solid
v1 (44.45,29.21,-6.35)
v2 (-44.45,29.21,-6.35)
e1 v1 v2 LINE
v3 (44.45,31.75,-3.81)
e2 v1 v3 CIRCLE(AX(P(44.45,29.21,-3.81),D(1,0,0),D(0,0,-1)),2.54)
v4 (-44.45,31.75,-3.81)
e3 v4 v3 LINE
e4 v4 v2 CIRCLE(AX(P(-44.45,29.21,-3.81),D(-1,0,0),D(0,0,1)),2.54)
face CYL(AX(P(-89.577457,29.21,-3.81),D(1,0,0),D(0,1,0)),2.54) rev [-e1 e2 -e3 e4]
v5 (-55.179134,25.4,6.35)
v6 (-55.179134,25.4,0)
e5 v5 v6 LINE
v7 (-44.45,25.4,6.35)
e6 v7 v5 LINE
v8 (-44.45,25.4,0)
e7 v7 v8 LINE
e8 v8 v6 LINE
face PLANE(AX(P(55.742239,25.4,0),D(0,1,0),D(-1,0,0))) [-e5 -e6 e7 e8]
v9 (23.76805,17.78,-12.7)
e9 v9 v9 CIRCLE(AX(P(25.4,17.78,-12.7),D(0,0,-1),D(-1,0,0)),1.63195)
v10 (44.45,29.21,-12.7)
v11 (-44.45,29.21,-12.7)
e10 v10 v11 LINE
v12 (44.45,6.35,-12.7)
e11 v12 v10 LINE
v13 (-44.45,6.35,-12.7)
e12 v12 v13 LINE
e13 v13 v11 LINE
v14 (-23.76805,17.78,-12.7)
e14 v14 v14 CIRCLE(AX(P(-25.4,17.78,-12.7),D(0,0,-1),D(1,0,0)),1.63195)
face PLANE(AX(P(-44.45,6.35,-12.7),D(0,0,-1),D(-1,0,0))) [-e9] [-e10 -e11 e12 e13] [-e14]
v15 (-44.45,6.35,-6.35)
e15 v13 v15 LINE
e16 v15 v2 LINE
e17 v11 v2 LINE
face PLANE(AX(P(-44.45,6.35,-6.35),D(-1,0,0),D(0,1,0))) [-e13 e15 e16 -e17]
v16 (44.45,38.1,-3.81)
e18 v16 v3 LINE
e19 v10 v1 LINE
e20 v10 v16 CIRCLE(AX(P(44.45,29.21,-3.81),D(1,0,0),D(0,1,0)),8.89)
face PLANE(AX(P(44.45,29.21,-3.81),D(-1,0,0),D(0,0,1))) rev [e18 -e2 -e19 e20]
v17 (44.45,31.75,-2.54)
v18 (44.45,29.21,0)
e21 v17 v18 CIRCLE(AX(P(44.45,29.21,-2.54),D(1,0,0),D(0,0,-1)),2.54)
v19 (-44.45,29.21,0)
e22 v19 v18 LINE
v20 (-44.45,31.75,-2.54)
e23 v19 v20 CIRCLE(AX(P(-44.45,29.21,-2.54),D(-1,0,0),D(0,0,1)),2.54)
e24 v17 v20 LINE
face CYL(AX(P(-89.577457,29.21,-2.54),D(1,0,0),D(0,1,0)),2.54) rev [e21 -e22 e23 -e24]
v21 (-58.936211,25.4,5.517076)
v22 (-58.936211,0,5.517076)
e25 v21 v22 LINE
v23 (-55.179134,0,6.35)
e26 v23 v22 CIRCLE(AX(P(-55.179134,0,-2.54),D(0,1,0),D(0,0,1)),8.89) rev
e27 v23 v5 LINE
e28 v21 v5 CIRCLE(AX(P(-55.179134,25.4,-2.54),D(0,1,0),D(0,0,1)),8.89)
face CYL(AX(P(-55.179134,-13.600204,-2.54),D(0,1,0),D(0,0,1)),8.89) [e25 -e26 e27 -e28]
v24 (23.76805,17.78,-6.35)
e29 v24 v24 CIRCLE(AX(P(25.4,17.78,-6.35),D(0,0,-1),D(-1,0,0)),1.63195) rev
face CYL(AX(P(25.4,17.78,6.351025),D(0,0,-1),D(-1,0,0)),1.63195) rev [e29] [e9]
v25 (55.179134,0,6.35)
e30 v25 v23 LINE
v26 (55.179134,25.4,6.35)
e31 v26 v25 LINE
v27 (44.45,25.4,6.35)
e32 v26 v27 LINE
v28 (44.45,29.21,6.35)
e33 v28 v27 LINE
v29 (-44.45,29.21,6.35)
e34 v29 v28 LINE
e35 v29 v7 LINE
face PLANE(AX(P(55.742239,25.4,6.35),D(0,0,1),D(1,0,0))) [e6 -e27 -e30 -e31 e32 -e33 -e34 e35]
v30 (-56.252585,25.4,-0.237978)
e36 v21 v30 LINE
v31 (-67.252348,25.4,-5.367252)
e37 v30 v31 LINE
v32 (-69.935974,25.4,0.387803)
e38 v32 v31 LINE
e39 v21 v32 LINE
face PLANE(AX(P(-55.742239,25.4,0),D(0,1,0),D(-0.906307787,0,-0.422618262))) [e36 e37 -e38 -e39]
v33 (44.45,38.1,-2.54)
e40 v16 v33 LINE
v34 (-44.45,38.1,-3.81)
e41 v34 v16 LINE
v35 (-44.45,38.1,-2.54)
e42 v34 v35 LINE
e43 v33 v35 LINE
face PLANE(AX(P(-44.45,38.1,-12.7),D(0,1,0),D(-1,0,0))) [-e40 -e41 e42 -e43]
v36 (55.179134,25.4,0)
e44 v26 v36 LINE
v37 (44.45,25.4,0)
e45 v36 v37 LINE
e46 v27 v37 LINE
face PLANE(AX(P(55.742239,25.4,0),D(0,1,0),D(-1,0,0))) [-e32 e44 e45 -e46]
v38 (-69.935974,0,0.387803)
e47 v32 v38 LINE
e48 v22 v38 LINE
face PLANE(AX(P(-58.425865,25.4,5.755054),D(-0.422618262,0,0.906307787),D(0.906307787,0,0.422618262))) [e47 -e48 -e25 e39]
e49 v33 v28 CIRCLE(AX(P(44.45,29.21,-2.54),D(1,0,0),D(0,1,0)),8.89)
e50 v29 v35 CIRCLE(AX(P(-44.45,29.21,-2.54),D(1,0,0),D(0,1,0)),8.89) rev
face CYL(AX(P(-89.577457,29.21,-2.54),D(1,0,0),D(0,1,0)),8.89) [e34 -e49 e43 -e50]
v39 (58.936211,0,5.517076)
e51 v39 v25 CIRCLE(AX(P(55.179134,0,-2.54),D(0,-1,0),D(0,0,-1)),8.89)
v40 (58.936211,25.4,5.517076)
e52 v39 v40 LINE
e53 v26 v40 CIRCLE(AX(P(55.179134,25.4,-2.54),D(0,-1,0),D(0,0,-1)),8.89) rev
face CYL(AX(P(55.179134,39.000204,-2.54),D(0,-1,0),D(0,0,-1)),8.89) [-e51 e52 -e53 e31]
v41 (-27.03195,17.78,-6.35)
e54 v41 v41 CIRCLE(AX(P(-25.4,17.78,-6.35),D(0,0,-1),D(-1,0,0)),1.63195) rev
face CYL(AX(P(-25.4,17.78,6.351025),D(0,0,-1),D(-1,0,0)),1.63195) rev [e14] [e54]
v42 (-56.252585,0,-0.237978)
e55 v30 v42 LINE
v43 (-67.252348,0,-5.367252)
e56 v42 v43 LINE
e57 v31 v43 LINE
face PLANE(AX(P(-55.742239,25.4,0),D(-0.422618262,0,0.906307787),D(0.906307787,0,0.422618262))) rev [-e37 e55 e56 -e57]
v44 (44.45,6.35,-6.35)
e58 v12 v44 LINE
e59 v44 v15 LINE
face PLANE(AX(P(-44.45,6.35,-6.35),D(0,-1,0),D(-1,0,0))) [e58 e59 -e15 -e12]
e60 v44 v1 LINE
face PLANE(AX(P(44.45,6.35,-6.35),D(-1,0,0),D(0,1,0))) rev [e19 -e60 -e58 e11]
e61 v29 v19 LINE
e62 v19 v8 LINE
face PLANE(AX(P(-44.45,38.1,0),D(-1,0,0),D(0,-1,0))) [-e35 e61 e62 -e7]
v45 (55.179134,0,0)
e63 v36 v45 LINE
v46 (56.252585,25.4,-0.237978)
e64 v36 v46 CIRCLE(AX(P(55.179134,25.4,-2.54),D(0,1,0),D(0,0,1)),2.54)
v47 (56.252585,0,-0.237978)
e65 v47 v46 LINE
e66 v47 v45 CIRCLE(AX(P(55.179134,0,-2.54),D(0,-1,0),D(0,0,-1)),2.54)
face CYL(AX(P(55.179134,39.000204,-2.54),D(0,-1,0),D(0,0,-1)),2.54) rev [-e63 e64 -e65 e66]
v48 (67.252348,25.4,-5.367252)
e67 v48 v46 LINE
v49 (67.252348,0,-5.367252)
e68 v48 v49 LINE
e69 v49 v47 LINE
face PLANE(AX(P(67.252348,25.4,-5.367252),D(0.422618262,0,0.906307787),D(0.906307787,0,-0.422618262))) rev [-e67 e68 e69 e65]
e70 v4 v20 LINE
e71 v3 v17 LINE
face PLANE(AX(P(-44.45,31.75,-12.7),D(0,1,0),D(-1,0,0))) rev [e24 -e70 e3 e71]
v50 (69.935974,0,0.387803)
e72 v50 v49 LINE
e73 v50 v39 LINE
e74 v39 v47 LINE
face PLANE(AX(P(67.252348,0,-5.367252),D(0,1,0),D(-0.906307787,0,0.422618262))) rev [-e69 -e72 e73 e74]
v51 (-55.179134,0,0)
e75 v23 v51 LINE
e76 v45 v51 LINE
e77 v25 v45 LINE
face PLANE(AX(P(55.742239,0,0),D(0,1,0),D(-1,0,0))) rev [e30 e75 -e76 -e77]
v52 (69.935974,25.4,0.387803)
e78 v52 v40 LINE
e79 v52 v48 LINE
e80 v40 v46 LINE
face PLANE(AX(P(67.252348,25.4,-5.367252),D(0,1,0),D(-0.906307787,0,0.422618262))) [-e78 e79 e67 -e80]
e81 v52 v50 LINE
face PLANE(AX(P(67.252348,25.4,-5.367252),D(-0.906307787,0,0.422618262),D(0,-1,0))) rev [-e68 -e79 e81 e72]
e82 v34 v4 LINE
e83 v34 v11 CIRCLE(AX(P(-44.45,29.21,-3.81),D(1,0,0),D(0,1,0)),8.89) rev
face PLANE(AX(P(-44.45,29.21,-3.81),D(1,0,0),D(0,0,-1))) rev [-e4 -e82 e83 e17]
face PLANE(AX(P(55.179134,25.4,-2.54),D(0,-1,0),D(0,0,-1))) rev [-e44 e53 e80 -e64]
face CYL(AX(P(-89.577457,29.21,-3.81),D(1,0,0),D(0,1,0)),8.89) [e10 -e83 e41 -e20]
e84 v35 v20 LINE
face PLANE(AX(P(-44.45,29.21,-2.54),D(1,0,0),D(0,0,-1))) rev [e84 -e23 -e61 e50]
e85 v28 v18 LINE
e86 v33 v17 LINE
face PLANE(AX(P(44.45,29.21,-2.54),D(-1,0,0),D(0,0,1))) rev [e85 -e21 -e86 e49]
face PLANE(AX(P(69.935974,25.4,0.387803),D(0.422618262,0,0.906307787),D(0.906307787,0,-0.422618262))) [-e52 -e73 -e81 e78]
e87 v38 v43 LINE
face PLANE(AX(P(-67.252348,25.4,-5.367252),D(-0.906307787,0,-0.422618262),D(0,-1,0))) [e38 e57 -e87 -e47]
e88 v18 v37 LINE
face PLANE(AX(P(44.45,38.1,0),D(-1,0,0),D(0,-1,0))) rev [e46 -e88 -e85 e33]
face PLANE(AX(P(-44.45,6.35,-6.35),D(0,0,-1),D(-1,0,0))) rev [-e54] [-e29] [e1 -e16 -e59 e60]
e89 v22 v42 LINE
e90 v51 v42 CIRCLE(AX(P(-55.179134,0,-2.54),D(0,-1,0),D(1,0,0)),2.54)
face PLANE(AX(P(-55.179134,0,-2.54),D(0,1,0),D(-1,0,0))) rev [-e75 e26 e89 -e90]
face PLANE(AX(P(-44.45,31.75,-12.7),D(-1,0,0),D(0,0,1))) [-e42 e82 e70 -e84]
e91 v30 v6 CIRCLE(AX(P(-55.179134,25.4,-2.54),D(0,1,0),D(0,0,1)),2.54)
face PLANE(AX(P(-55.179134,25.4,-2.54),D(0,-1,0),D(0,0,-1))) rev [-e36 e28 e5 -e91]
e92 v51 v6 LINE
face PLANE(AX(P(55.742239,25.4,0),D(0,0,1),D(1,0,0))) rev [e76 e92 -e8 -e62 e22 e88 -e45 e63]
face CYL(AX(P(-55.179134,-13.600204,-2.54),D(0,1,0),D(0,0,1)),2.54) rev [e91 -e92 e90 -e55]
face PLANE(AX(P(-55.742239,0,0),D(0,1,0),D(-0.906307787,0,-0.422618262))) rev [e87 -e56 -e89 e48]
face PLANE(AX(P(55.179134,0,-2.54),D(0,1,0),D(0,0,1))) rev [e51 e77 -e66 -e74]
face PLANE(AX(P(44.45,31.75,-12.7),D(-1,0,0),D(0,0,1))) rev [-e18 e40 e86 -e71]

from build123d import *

# Parameters (mm, degrees)
BOSS_EXTRUDE1_DEPTH    = 25.4
SKETCH2_W              = 88.9
SKETCH2_H              = 6.35
BOSS_EXTRUDE2_DEPTH    = 12.7
SKETCH3_W              = 88.9
SKETCH3_H              = 6.35
BOSS_EXTRUDE3_DEPTH    = 12.7
SKETCH4_W              = 88.9
SKETCH4_H              = 6.35
BOSS_EXTRUDE5_DEPTH    = 25.4
FILLET4_R              = 2.54
CONVERT_SOLID1_START   = -1
CONVERT_SOLID1_DEPTH   = 32.8041528
CONVERT_SOLID1_START_2 = -44.45
CONVERT_SOLID1_2_DEPTH = 88.9
CUT_EXTRUDE1_REACH     = 83.887
SKETCH6_R              = 1.63195
UNFOLD1_START          = -12.7
UNFOLD1_OUTLINE_R      = 1.63195
UNFOLD1_DEPTH          = 12.7
UNFOLD1_2_OUTLINE_W    = 1.190330825
UNFOLD1_2_OUTLINE_H    = 25.4
UNFOLD1_2_DEPTH        = 1.940687
UNFOLD1_3_OUTLINE_W    = 88.9
UNFOLD1_3_OUTLINE_H    = 45.894202015
UNFOLD1_3_OUTLINE_R    = 1.63195
UNFOLD1_3_DEPTH        = 6.35
FOLD1_START            = 38.1
FOLD1_OUTLINE_W        = 88.9
FOLD1_OUTLINE_H        = 6.35
FOLD1_DEPTH            = 33.194202015
FOLD1_2_DEPTH          = 25.4
FOLD1_START_2          = 6.35
FOLD1_3_OUTLINE_W      = 88.9
FOLD1_3_OUTLINE_H      = 6.35
FOLD1_3_DEPTH          = 9.7980499
FOLD1_START_3          = 19.4119501
FOLD1_4_OUTLINE_W      = 88.9
FOLD1_4_OUTLINE_H      = 6.35
FOLD1_4_DEPTH          = 9.7980499
FOLD1_START_4          = 31.75
FOLD1_5_OUTLINE_W      = 88.9
FOLD1_5_OUTLINE_H      = 6.35
FOLD1_5_DEPTH          = 5.563988164
FOLD1_6_DEPTH          = 25.4
FOLD1_START_5          = -44.45
FOLD1_7_DEPTH          = 88.9
FOLD1_START_6          = -12.7
FOLD1_8_DEPTH          = 6.35
FOLD1_9_DEPTH          = 88.9


with BuildPart() as part:
    # Sketch1 → Boss-Extrude1 (new body)
    with BuildSketch(Plane(origin=(0, 0, 0), x_dir=(1, 0, 0), z_dir=(0, 1, 0))):
        Polygon((-57.15, -6.35), (57.15, -6.35), (69.93597375, -0.387802524), (67.252347788, 5.367251924), (55.742238892, 0), (-55.742238892, 0), (-67.252347788, 5.367251924), (-69.93597375, -0.387802524), align=None)
    extrude(amount=BOSS_EXTRUDE1_DEPTH)

    # Sketch2 → Boss-Extrude2 (add)
    with BuildSketch(Plane(origin=(0, 25.4, 0), x_dir=(1, 0, 0), z_dir=(0, 1, 0))):
        with Locations((0, -3.175)):
            Rectangle(SKETCH2_W, SKETCH2_H)
    extrude(amount=BOSS_EXTRUDE2_DEPTH)

    # Sketch3 → Boss-Extrude3 (add)
    with BuildSketch(Plane(origin=(0, 0, 0), x_dir=(-1, 0, 0), z_dir=(0, 0, -1))):
        with Locations((0, 34.925)):
            Rectangle(SKETCH3_W, SKETCH3_H)
    extrude(amount=BOSS_EXTRUDE3_DEPTH)

    # Sketch4 → Boss-Extrude5 (add)
    with BuildSketch(Plane.XZ.offset(-31.75)):
        with Locations((0, -9.525)):
            Rectangle(SKETCH4_W, SKETCH4_H)
    extrude(amount=BOSS_EXTRUDE5_DEPTH)

    # Fillet4
    fillet4_edges = [part.edges().sort_by_distance(p)[0] for p in [
        (57.15, 12.7, 6.35),
        (-57.15, 12.7, 6.35),
        (-55.742238892, 12.7, 0),
        (55.742238892, 12.7, 0),
        (0, 38.1, 6.35),
        (0, 31.75, -6.35),
        (0, 38.1, -12.7),
        (0, 31.75, 0),
    ]]
    fillet(fillet4_edges, radius=FILLET4_R)

    # Convert-Solid1: read off the stored shape, not the designer's step
    # Convert-Solid1 outline → Convert-Solid1 (cut)
    with BuildSketch(Plane(origin=(0, 0, 0), x_dir=(1, 0, 0), z_dir=(0, 1, 0)).offset(CONVERT_SOLID1_START)):
        with BuildLine():
            ThreePointArc((58.936210796, -5.517076227), (57.103282617, -6.139271503), (55.179134449, -6.35))
            Line((55.179134449, -6.35), (56.586895557, -6.35))
            ThreePointArc((56.586895557, -6.35), (57.136652176, -6.289791858), (57.660345942, -6.112021779))
            Line((57.660345942, -6.112021779), (58.936210796, -5.517076227))
        make_face()
        with BuildLine():
            Line((-56.586895557, -6.35), (-55.179134449, -6.35))
            ThreePointArc((-55.179134449, -6.35), (-57.103282617, -6.139271503), (-58.936210796, -5.517076227))
            Line((-58.936210796, -5.517076227), (-57.660345942, -6.112021779))
            ThreePointArc((-57.660345942, -6.112021779), (-57.136652176, -6.289791858), (-56.586895557, -6.35))
        make_face()
    extrude(amount=CONVERT_SOLID1_DEPTH, mode=Mode.SUBTRACT)

    # Convert-Solid1 2 outline → Convert-Solid1 2 (cut)
    with BuildSketch(Plane.YZ.offset(CONVERT_SOLID1_START_2)):
        with BuildLine():
            ThreePointArc((29.21, 6.35), (35.496179285, 3.746179285), (38.1, -2.54))
            Line((38.1, -2.54), (38.1, 3.81))
            ThreePointArc((38.1, 3.81), (37.356051224, 5.606051224), (35.56, 6.35))
            Line((35.56, 6.35), (29.21, 6.35))
        make_face()
        with BuildLine():
            ThreePointArc((38.1, -3.81), (35.496179285, -10.096179285), (29.21, -12.7))
            Line((29.21, -12.7), (35.56, -12.7))
            ThreePointArc((35.56, -12.7), (37.356051224, -11.956051224), (38.1, -10.16))
            Line((38.1, -10.16), (38.1, -3.81))
        make_face()
    extrude(amount=CONVERT_SOLID1_2_DEPTH, mode=Mode.SUBTRACT)

    # Sketch6 → Cut-Extrude1 (cut, up to next)
    with BuildSketch(Plane(origin=(0, 0, -12.7), x_dir=(-1, 0, 0), z_dir=(0, 0, -1)), mode=Mode.PRIVATE) as cut_extrude1_sk1:
        with Locations((-25.4, 17.78)):
            Circle(SKETCH6_R)
    cut_extrude1_tool1 = extrude(cut_extrude1_sk1.sketch, amount=-CUT_EXTRUDE1_REACH, mode=Mode.PRIVATE) & part.part
    # Sketch6 → Cut-Extrude1 (cut, up to next)
    with BuildSketch(Plane(origin=(0, 0, -12.7), x_dir=(-1, 0, 0), z_dir=(0, 0, -1)), mode=Mode.PRIVATE) as cut_extrude1_sk2:
        with Locations((25.4, 17.78)):
            Circle(SKETCH6_R)
    cut_extrude1_tool2 = extrude(cut_extrude1_sk2.sketch, amount=-CUT_EXTRUDE1_REACH, mode=Mode.PRIVATE) & part.part
    add(cut_extrude1_tool1.solids().sort_by_distance((25.4, 17.78, -12.7))[0], mode=Mode.SUBTRACT)
    add(cut_extrude1_tool2.solids().sort_by_distance((-25.4, 17.78, -12.7))[0], mode=Mode.SUBTRACT)

    # Unfold1: read off the stored shape, not the designer's step
    # Unfold1 outline → Unfold1 (cut)
    with BuildSketch(Plane.XY.offset(UNFOLD1_START)):
        Polygon((44.45, 38.1), (-44.45, 38.1), (-44.45, 25.4), (-69.809669175, 25.4), (-69.809669175, 0), (69.809669175, 0), (69.809669175, 25.4), (44.45, 25.4), align=None)
        with Locations((25.4, 17.78)):
            Circle(UNFOLD1_OUTLINE_R, mode=Mode.SUBTRACT)
        with Locations((-25.4, 17.78)):
            Circle(UNFOLD1_OUTLINE_R, mode=Mode.SUBTRACT)
    extrude(amount=UNFOLD1_DEPTH, mode=Mode.SUBTRACT)

    # Unfold1 2 outline → Unfold1 2 (cut)
    with BuildSketch(Plane.XY):
        with Locations((-70.404834588, 12.7)):
            Rectangle(UNFOLD1_2_OUTLINE_W, UNFOLD1_2_OUTLINE_H)
        with Locations((70.404834588, 12.7)):
            Rectangle(UNFOLD1_2_OUTLINE_W, UNFOLD1_2_OUTLINE_H)
    extrude(amount=UNFOLD1_2_DEPTH, mode=Mode.SUBTRACT)

    # Unfold1 3 outline → Unfold1 3 (add)
    # profile 1 of 2: a face of its own
    with BuildSketch(Plane.XY):
        with Locations((0, 48.347101008)):
            Rectangle(UNFOLD1_3_OUTLINE_W, UNFOLD1_3_OUTLINE_H)
        with Locations((-25.4, 59.864202015)):
            Circle(UNFOLD1_3_OUTLINE_R, mode=Mode.SUBTRACT)
        with Locations((25.4, 59.864202015)):
            Circle(UNFOLD1_3_OUTLINE_R, mode=Mode.SUBTRACT)
    # profile 2 of 2: a face of its own
    with BuildSketch(Plane.XY):
        Polygon((-44.45, 6.35), (-44.45, 25.4), (-69.809669175, 25.4), (-69.809669175, 0), (69.809669175, 0), (69.809669175, 25.4), (44.45, 25.4), (44.45, 6.35), align=None)
    extrude(amount=UNFOLD1_3_DEPTH)

    # Fold1: read off the stored shape, not the designer's step
    # Fold1 outline → Fold1 (cut)
    with BuildSketch(Plane(origin=(0, 0, 0), x_dir=(1, 0, 0), z_dir=(0, 1, 0)).offset(FOLD1_START)):
        with Locations((0, -3.175)):
            Rectangle(FOLD1_OUTLINE_W, FOLD1_OUTLINE_H)
    extrude(amount=FOLD1_DEPTH, mode=Mode.SUBTRACT)

    # Fold1 2 outline → Fold1 2 (cut)
    with BuildSketch(Plane(origin=(0, 0, 0), x_dir=(1, 0, 0), z_dir=(0, 1, 0))):
        with BuildLine():
            Line((-58.936210796, -5.517076227), (-69.809669175, -0.446699315))
            Line((-69.809669175, -0.446699315), (-69.809669175, -6.35))
            Line((-69.809669175, -6.35), (-55.179134449, -6.35))
            ThreePointArc((-55.179134449, -6.35), (-57.103282617, -6.139271503), (-58.936210796, -5.517076227))
        make_face()
        Polygon((-69.809669175, -0.116941489), (-69.755138463, 0), (-69.809669175, 0), align=None)
        with BuildLine():
            Line((69.809669175, -6.35), (69.809669175, -0.446699315))
            Line((69.809669175, -0.446699315), (58.936210796, -5.517076227))
            ThreePointArc((58.936210796, -5.517076227), (57.103282617, -6.139271503), (55.179134449, -6.35))
            Line((55.179134449, -6.35), (69.809669175, -6.35))
        make_face()
        Polygon((69.809669175, 0), (69.755138463, 0), (69.809669175, -0.116941489), align=None)
    extrude(amount=FOLD1_2_DEPTH, mode=Mode.SUBTRACT)

    # Fold1 3 outline → Fold1 3 (add)
    with BuildSketch(Plane(origin=(0, 0, 0), x_dir=(1, 0, 0), z_dir=(0, 1, 0)).offset(FOLD1_START_2)):
        with Locations((0, 9.525)):
            Rectangle(FOLD1_3_OUTLINE_W, FOLD1_3_OUTLINE_H)
        Polygon((-69.809669175, -0.446699315), (-69.809669175, -0.116941489), (-69.93597375, -0.387802524), align=None)
        with BuildLine():
            ThreePointArc((-55.179134449, 0), (-55.728891069, 0.060208142), (-56.252584834, 0.237978221))
            Line((-56.252584834, 0.237978221), (-67.252347788, 5.367251924))
            Line((-67.252347788, 5.367251924), (-69.755138463, 0))
            Line((-69.755138463, 0), (-55.179134449, 0))
        make_face()
        with BuildLine():
            Line((67.252347788, 5.367251924), (56.252584834, 0.237978221))
            ThreePointArc((56.252584834, 0.237978221), (55.728891069, 0.060208142), (55.179134449, 0))
            Line((55.179134449, 0), (69.755138463, 0))
            Line((69.755138463, 0), (67.252347788, 5.367251924))
        make_face()
        Polygon((69.93597375, -0.387802524), (69.809669175, -0.116941489), (69.809669175, -0.446699315), align=None)
    extrude(amount=FOLD1_3_DEPTH)

    # Fold1 5 outline → Fold1 5 (add)
    with BuildSketch(Plane(origin=(0, 0, 0), x_dir=(1, 0, 0), z_dir=(0, 1, 0)).offset(FOLD1_START_4)):
        with Locations((0, 3.175)):
            Rectangle(FOLD1_5_OUTLINE_W, FOLD1_5_OUTLINE_H)
    extrude(amount=FOLD1_5_DEPTH)

    # Fold1 6 outline → Fold1 6 (add)
    with BuildSketch(Plane(origin=(0, 0, 0), x_dir=(1, 0, 0), z_dir=(0, 1, 0))):
        Polygon((-69.809669175, -0.446699315), (-69.809669175, -0.116941489), (-69.93597375, -0.387802524), align=None)
        with BuildLine():
            ThreePointArc((-55.179134449, 0), (-55.728891069, 0.060208142), (-56.252584834, 0.237978221))
            Line((-56.252584834, 0.237978221), (-67.252347788, 5.367251924))
            Line((-67.252347788, 5.367251924), (-69.755138463, 0))
            Line((-69.755138463, 0), (-55.179134449, 0))
        make_face()
        with BuildLine():
            Line((67.252347788, 5.367251924), (56.252584834, 0.237978221))
            ThreePointArc((56.252584834, 0.237978221), (55.728891069, 0.060208142), (55.179134449, 0))
            Line((55.179134449, 0), (69.755138463, 0))
            Line((69.755138463, 0), (67.252347788, 5.367251924))
        make_face()
        Polygon((69.93597375, -0.387802524), (69.809669175, -0.116941489), (69.809669175, -0.446699315), align=None)
    extrude(amount=FOLD1_6_DEPTH)



with BuildPart() as body_2:
    # Fold1 4 outline → Fold1 4 (new body)
    with BuildSketch(Plane(origin=(0, 0, 0), x_dir=(1, 0, 0), z_dir=(0, 1, 0)).offset(FOLD1_START_3)):
        with Locations((0, 9.525)):
            Rectangle(FOLD1_4_OUTLINE_W, FOLD1_4_OUTLINE_H)
    extrude(amount=FOLD1_4_DEPTH)


with BuildPart() as part_1:
    add(part.part)

    add(body_2.part)  # Fold1 7 merges body 2
    # Fold1 7 outline → Fold1 7 (add)
    with BuildSketch(Plane.YZ.offset(FOLD1_START_5)):
        with BuildLine():
            ThreePointArc((29.21, -12.7), (35.496179285, -10.096179285), (38.1, -3.81))
            Line((38.1, -3.81), (38.1, -2.54))
            ThreePointArc((38.1, -2.54), (38.00686691, -1.256554415), (37.729418994, 0))
            Line((37.729418994, 0), (37.313988164, 0))
            Line((37.313988164, 0), (37.313988164, -6.35))
            Line((37.313988164, -6.35), (31.75, -6.35))
            Line((31.75, -6.35), (31.75, -3.81))
            ThreePointArc((31.75, -3.81), (31.006051224, -5.606051224), (29.21, -6.35))
            Line((29.21, -6.35), (29.21, -12.7))
        make_face()
        with BuildLine():
            ThreePointArc((29.21, 0), (31.006051224, -0.743948776), (31.75, -2.54))
            Line((31.75, -2.54), (31.75, 0))
            Line((31.75, 0), (29.21, 0))
        make_face()
    extrude(amount=FOLD1_7_DEPTH)

    # Fold1 8 outline → Fold1 8 (add)
    with BuildSketch(Plane.XY.offset(FOLD1_START_6)):
        with BuildLine():
            ThreePointArc((25.4, 19.41195), (27.03195, 17.78), (25.4, 16.14805))
            Line((25.4, 16.14805), (44.45, 16.1480499))
            Line((44.45, 16.1480499), (44.45, 19.4119501))
            Line((44.45, 19.4119501), (25.4, 19.41195))
        make_face()
        with BuildLine():
            ThreePointArc((25.4, 16.14805), (23.76805, 17.78), (25.4, 19.41195))
            Line((25.4, 19.41195), (-25.399999965, 19.41195))
            ThreePointArc((-25.399999965, 19.41195), (-23.76805, 17.779999965), (-25.400000035, 16.14805))
            Line((-25.400000035, 16.14805), (25.4, 16.14805))
        make_face()
        with BuildLine():
            ThreePointArc((-25.400000035, 16.14805), (-27.03195, 17.780000035), (-25.399999965, 19.41195))
            Line((-25.399999965, 19.41195), (-44.45, 19.4119501))
            Line((-44.45, 19.4119501), (-44.45, 16.1480499))
            Line((-44.45, 16.1480499), (-25.400000035, 16.14805))
        make_face()
    extrude(amount=FOLD1_8_DEPTH)

    # Fold1 9 outline → Fold1 9 (cut)
    with BuildSketch(Plane.YZ.offset(FOLD1_START_5)):
        with BuildLine():
            ThreePointArc((29.21, 6.35), (34.522791169, 4.587857322), (37.729418994, 0))
            Line((37.729418994, 0), (38.1, 0))
            Line((38.1, 0), (38.1, 6.35))
            Line((38.1, 6.35), (29.21, 6.35))
        make_face()
    extrude(amount=FOLD1_9_DEPTH, mode=Mode.SUBTRACT)


solid = part_1.part
